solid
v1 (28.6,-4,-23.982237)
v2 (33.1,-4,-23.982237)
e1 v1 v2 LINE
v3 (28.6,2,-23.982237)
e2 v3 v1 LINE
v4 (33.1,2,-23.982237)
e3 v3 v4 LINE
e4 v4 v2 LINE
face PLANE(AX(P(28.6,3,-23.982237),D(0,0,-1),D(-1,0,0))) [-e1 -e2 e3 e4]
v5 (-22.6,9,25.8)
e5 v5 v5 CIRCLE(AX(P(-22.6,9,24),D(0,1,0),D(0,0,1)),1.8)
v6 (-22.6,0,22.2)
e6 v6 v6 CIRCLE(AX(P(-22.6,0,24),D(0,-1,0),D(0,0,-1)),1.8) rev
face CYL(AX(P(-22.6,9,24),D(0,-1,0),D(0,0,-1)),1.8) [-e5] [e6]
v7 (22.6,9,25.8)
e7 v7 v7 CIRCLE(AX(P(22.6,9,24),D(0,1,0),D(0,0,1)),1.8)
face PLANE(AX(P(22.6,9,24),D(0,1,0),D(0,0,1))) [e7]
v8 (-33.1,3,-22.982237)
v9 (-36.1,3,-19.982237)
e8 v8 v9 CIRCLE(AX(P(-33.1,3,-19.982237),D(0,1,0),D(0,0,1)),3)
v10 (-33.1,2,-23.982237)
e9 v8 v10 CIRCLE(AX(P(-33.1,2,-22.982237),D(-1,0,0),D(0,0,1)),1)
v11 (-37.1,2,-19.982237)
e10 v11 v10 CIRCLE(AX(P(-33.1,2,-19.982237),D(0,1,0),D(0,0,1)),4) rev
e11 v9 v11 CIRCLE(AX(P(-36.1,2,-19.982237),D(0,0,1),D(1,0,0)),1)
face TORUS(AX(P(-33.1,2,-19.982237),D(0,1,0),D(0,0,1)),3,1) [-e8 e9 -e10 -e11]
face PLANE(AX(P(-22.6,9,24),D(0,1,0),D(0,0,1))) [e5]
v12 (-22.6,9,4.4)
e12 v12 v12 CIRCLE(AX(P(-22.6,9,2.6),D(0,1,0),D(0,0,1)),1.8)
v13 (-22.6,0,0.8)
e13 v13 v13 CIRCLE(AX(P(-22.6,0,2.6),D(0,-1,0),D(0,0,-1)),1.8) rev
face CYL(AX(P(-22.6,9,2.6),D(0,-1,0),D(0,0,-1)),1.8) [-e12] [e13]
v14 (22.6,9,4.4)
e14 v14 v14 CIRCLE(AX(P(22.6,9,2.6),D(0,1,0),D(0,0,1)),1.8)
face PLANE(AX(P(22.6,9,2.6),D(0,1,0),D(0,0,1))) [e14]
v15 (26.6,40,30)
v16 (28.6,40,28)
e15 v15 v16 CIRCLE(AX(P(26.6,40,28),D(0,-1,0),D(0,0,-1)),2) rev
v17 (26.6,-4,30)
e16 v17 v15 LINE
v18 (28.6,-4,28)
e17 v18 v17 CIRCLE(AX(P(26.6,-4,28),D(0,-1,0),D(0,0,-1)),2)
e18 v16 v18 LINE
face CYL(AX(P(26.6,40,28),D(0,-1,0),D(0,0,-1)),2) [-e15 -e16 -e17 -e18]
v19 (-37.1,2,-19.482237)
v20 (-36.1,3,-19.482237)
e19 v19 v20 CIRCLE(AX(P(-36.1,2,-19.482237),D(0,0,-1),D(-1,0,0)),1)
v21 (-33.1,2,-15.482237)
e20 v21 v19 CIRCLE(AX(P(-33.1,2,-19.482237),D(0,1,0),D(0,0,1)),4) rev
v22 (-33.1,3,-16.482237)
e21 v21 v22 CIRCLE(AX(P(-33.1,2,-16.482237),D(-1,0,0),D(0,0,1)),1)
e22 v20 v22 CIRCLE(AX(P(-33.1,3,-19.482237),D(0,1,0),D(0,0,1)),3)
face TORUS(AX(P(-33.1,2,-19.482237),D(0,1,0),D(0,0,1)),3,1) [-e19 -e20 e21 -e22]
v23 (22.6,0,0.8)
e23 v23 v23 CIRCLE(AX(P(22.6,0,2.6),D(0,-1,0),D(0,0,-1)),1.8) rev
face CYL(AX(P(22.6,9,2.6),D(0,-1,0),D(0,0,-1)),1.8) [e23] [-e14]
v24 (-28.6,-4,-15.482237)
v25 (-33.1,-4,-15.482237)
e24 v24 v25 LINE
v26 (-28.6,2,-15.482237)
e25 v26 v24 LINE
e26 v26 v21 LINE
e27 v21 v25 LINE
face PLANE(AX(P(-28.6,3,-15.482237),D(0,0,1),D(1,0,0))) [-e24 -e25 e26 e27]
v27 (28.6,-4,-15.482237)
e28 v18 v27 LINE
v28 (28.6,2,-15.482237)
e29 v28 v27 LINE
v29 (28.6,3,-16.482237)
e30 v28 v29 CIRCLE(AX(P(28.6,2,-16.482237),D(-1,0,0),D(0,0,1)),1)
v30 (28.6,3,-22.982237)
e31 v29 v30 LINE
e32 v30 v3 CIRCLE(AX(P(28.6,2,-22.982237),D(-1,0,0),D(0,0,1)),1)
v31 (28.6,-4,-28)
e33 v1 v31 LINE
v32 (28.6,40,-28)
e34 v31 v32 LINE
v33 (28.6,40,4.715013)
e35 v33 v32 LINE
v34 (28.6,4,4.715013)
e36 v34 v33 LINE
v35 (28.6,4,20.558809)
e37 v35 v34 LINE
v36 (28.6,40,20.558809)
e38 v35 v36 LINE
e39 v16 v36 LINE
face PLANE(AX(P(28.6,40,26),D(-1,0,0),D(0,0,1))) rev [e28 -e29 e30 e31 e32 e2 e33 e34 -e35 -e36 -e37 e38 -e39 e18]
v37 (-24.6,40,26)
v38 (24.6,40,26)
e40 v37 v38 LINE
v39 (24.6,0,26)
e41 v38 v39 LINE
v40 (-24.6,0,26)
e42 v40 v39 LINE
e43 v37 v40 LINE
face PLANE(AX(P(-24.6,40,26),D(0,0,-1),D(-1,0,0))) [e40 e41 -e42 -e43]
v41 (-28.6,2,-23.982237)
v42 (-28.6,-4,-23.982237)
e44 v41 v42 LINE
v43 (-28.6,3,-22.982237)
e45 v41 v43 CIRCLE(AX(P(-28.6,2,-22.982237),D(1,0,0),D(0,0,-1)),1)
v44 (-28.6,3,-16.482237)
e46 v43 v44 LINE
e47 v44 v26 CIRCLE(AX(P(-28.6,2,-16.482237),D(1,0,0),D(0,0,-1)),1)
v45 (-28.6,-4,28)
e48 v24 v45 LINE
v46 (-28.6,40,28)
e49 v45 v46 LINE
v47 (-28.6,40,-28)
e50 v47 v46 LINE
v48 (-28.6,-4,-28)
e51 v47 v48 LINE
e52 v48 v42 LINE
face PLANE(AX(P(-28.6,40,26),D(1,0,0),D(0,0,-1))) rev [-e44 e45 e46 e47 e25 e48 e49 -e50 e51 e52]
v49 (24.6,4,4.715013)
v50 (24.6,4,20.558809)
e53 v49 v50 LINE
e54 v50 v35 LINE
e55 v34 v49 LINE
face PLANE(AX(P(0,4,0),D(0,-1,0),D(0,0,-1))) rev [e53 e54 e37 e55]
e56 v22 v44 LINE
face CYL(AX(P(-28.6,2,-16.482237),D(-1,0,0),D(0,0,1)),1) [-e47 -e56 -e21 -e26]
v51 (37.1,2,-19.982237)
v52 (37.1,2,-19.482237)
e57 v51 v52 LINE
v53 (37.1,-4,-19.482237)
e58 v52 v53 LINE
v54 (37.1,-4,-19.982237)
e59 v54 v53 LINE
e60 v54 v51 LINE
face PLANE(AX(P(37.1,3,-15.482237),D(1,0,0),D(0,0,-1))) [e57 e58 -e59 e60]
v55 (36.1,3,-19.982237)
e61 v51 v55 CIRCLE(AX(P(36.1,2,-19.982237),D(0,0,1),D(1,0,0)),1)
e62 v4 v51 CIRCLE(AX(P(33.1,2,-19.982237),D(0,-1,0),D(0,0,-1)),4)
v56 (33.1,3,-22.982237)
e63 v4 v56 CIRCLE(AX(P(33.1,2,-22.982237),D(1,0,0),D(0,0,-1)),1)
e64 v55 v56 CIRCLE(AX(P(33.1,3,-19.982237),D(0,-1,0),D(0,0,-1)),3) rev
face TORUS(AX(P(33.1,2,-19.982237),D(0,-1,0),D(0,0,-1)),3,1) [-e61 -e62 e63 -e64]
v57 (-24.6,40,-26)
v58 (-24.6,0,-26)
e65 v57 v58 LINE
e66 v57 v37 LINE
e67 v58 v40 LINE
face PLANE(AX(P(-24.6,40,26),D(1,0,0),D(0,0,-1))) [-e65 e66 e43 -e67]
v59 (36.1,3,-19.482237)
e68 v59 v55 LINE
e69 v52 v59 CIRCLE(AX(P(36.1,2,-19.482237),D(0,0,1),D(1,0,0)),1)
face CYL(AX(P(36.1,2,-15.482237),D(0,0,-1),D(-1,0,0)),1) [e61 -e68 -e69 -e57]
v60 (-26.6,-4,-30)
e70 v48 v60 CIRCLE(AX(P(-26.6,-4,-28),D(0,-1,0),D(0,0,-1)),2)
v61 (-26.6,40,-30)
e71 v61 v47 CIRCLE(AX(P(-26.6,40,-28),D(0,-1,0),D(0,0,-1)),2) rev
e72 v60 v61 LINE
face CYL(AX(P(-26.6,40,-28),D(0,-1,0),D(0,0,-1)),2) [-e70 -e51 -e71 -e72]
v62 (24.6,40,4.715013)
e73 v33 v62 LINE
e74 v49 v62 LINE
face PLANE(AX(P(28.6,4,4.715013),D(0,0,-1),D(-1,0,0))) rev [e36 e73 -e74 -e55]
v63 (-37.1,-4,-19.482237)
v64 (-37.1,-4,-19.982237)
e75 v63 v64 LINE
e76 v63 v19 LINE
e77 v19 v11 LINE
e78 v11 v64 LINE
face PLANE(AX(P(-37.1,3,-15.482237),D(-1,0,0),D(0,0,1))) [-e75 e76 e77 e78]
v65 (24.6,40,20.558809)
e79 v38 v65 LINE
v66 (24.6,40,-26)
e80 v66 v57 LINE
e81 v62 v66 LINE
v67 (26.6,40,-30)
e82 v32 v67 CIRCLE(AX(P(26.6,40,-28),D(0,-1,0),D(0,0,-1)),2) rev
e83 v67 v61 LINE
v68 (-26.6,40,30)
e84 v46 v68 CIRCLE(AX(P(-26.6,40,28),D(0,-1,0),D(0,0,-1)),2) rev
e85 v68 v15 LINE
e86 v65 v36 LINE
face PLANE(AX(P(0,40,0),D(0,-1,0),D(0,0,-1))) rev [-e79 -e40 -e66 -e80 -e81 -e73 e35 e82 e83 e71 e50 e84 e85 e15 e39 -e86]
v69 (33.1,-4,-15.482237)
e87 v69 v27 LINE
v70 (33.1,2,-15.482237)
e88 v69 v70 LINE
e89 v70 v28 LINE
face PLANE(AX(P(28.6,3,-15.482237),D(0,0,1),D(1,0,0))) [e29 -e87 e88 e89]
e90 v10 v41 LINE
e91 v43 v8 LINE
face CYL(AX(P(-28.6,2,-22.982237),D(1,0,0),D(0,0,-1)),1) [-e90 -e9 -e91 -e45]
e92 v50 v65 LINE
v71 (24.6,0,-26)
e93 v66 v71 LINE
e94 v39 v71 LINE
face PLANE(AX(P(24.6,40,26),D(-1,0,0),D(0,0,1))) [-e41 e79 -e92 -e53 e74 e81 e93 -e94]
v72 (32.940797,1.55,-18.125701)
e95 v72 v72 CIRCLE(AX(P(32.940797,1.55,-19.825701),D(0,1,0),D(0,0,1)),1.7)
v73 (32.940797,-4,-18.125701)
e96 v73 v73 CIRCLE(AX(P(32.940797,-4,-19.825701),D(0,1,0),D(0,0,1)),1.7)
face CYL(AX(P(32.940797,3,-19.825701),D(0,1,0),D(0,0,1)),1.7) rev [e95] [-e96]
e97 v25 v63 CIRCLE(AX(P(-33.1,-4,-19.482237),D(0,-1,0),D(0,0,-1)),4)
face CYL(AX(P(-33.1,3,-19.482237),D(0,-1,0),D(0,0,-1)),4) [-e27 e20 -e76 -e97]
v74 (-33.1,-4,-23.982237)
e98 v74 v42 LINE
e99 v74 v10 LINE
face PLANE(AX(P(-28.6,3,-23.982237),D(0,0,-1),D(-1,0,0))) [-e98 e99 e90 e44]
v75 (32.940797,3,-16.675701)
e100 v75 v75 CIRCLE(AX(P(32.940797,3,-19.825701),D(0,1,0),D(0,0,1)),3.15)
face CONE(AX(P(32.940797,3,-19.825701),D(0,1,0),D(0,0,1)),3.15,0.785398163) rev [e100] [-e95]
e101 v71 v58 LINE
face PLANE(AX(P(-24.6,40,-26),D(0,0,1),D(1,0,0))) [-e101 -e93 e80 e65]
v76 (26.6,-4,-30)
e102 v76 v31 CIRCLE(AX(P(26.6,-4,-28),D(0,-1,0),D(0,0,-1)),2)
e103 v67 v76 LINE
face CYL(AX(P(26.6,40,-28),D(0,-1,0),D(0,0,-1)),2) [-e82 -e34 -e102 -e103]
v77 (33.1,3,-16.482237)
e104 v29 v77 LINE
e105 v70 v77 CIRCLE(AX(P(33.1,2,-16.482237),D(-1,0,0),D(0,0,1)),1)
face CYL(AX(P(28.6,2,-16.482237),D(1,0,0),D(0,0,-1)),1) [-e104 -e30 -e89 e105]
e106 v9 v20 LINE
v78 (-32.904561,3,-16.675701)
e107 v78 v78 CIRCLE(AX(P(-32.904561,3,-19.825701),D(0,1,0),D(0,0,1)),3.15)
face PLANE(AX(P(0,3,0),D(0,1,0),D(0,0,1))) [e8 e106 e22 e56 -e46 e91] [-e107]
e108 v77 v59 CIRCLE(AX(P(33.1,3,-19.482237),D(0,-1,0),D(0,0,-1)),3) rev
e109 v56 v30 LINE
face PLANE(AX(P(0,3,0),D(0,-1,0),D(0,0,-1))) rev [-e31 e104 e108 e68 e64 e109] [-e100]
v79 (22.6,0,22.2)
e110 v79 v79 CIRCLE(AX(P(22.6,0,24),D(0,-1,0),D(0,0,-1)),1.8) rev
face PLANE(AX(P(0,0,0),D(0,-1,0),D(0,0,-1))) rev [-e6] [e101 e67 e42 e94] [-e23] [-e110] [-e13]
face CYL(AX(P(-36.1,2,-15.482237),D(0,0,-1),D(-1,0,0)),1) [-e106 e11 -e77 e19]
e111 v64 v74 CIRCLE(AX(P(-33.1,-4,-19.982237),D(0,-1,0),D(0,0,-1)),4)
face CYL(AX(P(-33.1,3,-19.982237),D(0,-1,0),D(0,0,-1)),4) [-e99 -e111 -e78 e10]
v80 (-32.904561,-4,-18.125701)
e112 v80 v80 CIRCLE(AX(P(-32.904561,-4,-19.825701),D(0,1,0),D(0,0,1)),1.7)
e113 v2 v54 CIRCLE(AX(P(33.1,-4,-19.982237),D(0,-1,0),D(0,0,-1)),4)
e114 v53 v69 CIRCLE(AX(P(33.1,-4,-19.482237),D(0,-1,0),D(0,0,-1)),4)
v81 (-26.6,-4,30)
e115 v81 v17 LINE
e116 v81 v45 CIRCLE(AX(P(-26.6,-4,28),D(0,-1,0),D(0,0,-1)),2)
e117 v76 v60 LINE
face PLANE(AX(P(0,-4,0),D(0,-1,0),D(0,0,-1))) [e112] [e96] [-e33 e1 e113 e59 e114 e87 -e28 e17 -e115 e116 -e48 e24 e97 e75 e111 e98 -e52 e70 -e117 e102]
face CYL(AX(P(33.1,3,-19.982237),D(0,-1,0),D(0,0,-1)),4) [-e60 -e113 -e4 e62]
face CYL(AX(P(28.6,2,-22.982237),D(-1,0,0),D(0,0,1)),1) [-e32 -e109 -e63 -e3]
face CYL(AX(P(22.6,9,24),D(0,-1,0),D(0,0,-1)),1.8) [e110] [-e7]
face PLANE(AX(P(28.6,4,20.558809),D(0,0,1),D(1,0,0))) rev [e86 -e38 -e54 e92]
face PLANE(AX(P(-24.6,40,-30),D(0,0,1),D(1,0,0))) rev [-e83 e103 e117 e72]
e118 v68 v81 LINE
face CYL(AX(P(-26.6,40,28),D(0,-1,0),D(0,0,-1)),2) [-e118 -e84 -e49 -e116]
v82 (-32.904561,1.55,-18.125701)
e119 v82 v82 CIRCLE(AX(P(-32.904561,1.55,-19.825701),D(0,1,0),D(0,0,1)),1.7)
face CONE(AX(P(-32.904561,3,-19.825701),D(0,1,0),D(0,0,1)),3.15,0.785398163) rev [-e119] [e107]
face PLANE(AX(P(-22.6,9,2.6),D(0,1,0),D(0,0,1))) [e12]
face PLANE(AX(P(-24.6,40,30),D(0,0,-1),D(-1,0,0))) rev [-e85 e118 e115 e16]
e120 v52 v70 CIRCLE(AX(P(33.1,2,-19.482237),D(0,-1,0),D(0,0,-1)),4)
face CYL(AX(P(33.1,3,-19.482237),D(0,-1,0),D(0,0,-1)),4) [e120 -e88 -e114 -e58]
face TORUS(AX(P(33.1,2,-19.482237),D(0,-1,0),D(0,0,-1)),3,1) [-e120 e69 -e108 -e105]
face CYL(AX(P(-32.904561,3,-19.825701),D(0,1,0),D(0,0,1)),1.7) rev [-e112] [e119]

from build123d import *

# Parameters (mm, degrees)
ESQUISSE1_W                                    = 49.2
ESQUISSE1_H                                    = 52
BOSS_EXTRU_1_DEPTH                             = 40
COQUE1_T                                       = 4
CONG_1_R                                       = 2
CONG_2_R                                       = 2
CONG_3_R                                       = 2
CONG_4_R                                       = 2
ESQUISSE5_R                                    = 1.8
BOSS_EXTRU_2_DEPTH                             = 9
ESQUISSE9_W                                    = 4
ESQUISSE9_H                                    = 15.843796137
ENL_V_MAT_EXTRU_3_DEPTH                        = 36
ESQUISSE11_W                                   = 8.5
ESQUISSE11_H                                   = 8.5
BOSS_EXTRU_4_DEPTH                             = 7
CONG_5_R                                       = 4
CONG_6_R                                       = 4
CONG_7_R                                       = 1
CONG_8_R                                       = 1
FRAISAGE_POUR_VIS_T_TE_FRAIS_E_M31_D           = 3.4
FRAISAGE_POUR_VIS_T_TE_FRAIS_E_M31_CSINK_D     = 6.3
FRAISAGE_POUR_VIS_T_TE_FRAIS_E_M31_CSINK_ANGLE = 90


with BuildPart() as part:
    # Esquisse1 → Boss.-Extru.1 (new body)
    with BuildSketch(Plane(origin=(0, 0, 0), x_dir=(1, 0, 0), z_dir=(0, 1, 0))):
        Rectangle(ESQUISSE1_W, ESQUISSE1_H)
    extrude(amount=BOSS_EXTRU_1_DEPTH)

    # Coque1
    coque1_openings = [part.faces().sort_by_distance(p)[0] for p in [
        (0, 40, 0),
    ]]
    offset(amount=COQUE1_T, openings=coque1_openings, kind=Kind.INTERSECTION)

    # Congé1
    # the kernel refuses this fillet: 2 mm, written as the material it takes off along each edge
    with BuildSketch(Plane(origin=(28.6, -9, 30), x_dir=(-1, 0, 0), z_dir=(0, 1, 0))) as cong_1_piece_1:
        with BuildLine():
            CenterArc((CONG_1_R, -CONG_1_R), CONG_1_R, 90, 90)
            Line((0, -CONG_1_R), (0, 0))
            Line((0, 0), (CONG_1_R, 0))
        make_face()
    extrude(amount=54, mode=Mode.SUBTRACT)

    # Congé2
    cong_2_edges = [part.edges().sort_by_distance(p)[0] for p in [
        (28.6, 18, -30),
    ]]
    fillet(cong_2_edges, radius=CONG_2_R)

    # Congé3
    cong_3_edges = [part.edges().sort_by_distance(p)[0] for p in [
        (-28.6, 18, -30),
    ]]
    fillet(cong_3_edges, radius=CONG_3_R)

    # Congé4
    cong_4_edges = [part.edges().sort_by_distance(p)[0] for p in [
        (-28.6, 18, 30),
    ]]
    fillet(cong_4_edges, radius=CONG_4_R)

    # Esquisse5 → Boss.-Extru.2 (add)
    with BuildSketch(Plane(origin=(0, 0, 0), x_dir=(1, 0, 0), z_dir=(0, 1, 0))):
        with Locations(Location((-22.6, -2.6, 0), (0, 0, 90))):
            Circle(ESQUISSE5_R)
        with Locations(Location((22.6, -2.6, 0), (0, 0, 90))):
            Circle(ESQUISSE5_R)
        with Locations(Location((-22.6, -24, 0), (0, 0, 90))):
            Circle(ESQUISSE5_R)
        with Locations(Location((22.6, -24, 0), (0, 0, 90))):
            Circle(ESQUISSE5_R)
    extrude(amount=BOSS_EXTRU_2_DEPTH)

    # Esquisse9 → Enlèv. mat.-Extru.3 (cut)
    with BuildSketch(Plane(origin=(0, 40, 0), x_dir=(1, 0, 0), z_dir=(0, 1, 0))):
        with Locations((26.6, -12.636910853)):
            Rectangle(ESQUISSE9_W, ESQUISSE9_H)
    extrude(amount=-ENL_V_MAT_EXTRU_3_DEPTH, mode=Mode.SUBTRACT)

    # Esquisse11 → Boss.-Extru.4 (add)
    with BuildSketch(Plane(origin=(0, -4, 0), x_dir=(-1, 0, 0), z_dir=(0, -1, 0))):
        with Locations((32.85, 19.732237021)):
            Rectangle(ESQUISSE11_W, ESQUISSE11_H)
        with Locations((-32.85, 19.732237021)):
            Rectangle(ESQUISSE11_W, ESQUISSE11_H)
    extrude(amount=-BOSS_EXTRU_4_DEPTH)

    # Congé5
    cong_5_edges = [part.edges().sort_by_distance(p)[0] for p in [
        (37.1, -0.5, -15.482237021),
        (37.1, -0.5, -23.982237021),
    ]]
    fillet(cong_5_edges, radius=CONG_5_R)

    # Congé6
    cong_6_edges = [part.edges().sort_by_distance(p)[0] for p in [
        (-37.1, -0.5, -23.982237021),
        (-37.1, -0.5, -15.482237021),
    ]]
    fillet(cong_6_edges, radius=CONG_6_R)

    # Congé7
    cong_7_edges = [part.edges().sort_by_distance(p)[0] for p in [
        (-37.1, 3, -19.732237021),
        (-30.85, 3, -23.982237021),
        (-35.928427125, 3, -16.653809897),
        (-35.928427125, 3, -22.810664146),
        (-30.85, 3, -15.482237021),
    ]]
    fillet(cong_7_edges, radius=CONG_7_R)

    # Congé8
    cong_8_edges = [part.edges().sort_by_distance(p)[0] for p in [
        (37.1, 3, -19.732237021),
        (30.85, 3, -15.482237021),
        (35.928427125, 3, -22.810664146),
        (35.928427125, 3, -16.653809897),
        (30.85, 3, -23.982237021),
    ]]
    fillet(cong_8_edges, radius=CONG_8_R)

    # Fraisage pour vis à tête fraisée M31 (through all)
    with Locations(Plane(origin=(0, 3, 0), x_dir=(1, 0, 0), z_dir=(0, 1, 0))):
        with Locations((-32.904561285, 19.825700849), (32.940796686, 19.825700849)):
            CounterSinkHole(FRAISAGE_POUR_VIS_T_TE_FRAIS_E_M31_D / 2, FRAISAGE_POUR_VIS_T_TE_FRAIS_E_M31_CSINK_D / 2, counter_sink_angle=FRAISAGE_POUR_VIS_T_TE_FRAIS_E_M31_CSINK_ANGLE)


solid = part.part
